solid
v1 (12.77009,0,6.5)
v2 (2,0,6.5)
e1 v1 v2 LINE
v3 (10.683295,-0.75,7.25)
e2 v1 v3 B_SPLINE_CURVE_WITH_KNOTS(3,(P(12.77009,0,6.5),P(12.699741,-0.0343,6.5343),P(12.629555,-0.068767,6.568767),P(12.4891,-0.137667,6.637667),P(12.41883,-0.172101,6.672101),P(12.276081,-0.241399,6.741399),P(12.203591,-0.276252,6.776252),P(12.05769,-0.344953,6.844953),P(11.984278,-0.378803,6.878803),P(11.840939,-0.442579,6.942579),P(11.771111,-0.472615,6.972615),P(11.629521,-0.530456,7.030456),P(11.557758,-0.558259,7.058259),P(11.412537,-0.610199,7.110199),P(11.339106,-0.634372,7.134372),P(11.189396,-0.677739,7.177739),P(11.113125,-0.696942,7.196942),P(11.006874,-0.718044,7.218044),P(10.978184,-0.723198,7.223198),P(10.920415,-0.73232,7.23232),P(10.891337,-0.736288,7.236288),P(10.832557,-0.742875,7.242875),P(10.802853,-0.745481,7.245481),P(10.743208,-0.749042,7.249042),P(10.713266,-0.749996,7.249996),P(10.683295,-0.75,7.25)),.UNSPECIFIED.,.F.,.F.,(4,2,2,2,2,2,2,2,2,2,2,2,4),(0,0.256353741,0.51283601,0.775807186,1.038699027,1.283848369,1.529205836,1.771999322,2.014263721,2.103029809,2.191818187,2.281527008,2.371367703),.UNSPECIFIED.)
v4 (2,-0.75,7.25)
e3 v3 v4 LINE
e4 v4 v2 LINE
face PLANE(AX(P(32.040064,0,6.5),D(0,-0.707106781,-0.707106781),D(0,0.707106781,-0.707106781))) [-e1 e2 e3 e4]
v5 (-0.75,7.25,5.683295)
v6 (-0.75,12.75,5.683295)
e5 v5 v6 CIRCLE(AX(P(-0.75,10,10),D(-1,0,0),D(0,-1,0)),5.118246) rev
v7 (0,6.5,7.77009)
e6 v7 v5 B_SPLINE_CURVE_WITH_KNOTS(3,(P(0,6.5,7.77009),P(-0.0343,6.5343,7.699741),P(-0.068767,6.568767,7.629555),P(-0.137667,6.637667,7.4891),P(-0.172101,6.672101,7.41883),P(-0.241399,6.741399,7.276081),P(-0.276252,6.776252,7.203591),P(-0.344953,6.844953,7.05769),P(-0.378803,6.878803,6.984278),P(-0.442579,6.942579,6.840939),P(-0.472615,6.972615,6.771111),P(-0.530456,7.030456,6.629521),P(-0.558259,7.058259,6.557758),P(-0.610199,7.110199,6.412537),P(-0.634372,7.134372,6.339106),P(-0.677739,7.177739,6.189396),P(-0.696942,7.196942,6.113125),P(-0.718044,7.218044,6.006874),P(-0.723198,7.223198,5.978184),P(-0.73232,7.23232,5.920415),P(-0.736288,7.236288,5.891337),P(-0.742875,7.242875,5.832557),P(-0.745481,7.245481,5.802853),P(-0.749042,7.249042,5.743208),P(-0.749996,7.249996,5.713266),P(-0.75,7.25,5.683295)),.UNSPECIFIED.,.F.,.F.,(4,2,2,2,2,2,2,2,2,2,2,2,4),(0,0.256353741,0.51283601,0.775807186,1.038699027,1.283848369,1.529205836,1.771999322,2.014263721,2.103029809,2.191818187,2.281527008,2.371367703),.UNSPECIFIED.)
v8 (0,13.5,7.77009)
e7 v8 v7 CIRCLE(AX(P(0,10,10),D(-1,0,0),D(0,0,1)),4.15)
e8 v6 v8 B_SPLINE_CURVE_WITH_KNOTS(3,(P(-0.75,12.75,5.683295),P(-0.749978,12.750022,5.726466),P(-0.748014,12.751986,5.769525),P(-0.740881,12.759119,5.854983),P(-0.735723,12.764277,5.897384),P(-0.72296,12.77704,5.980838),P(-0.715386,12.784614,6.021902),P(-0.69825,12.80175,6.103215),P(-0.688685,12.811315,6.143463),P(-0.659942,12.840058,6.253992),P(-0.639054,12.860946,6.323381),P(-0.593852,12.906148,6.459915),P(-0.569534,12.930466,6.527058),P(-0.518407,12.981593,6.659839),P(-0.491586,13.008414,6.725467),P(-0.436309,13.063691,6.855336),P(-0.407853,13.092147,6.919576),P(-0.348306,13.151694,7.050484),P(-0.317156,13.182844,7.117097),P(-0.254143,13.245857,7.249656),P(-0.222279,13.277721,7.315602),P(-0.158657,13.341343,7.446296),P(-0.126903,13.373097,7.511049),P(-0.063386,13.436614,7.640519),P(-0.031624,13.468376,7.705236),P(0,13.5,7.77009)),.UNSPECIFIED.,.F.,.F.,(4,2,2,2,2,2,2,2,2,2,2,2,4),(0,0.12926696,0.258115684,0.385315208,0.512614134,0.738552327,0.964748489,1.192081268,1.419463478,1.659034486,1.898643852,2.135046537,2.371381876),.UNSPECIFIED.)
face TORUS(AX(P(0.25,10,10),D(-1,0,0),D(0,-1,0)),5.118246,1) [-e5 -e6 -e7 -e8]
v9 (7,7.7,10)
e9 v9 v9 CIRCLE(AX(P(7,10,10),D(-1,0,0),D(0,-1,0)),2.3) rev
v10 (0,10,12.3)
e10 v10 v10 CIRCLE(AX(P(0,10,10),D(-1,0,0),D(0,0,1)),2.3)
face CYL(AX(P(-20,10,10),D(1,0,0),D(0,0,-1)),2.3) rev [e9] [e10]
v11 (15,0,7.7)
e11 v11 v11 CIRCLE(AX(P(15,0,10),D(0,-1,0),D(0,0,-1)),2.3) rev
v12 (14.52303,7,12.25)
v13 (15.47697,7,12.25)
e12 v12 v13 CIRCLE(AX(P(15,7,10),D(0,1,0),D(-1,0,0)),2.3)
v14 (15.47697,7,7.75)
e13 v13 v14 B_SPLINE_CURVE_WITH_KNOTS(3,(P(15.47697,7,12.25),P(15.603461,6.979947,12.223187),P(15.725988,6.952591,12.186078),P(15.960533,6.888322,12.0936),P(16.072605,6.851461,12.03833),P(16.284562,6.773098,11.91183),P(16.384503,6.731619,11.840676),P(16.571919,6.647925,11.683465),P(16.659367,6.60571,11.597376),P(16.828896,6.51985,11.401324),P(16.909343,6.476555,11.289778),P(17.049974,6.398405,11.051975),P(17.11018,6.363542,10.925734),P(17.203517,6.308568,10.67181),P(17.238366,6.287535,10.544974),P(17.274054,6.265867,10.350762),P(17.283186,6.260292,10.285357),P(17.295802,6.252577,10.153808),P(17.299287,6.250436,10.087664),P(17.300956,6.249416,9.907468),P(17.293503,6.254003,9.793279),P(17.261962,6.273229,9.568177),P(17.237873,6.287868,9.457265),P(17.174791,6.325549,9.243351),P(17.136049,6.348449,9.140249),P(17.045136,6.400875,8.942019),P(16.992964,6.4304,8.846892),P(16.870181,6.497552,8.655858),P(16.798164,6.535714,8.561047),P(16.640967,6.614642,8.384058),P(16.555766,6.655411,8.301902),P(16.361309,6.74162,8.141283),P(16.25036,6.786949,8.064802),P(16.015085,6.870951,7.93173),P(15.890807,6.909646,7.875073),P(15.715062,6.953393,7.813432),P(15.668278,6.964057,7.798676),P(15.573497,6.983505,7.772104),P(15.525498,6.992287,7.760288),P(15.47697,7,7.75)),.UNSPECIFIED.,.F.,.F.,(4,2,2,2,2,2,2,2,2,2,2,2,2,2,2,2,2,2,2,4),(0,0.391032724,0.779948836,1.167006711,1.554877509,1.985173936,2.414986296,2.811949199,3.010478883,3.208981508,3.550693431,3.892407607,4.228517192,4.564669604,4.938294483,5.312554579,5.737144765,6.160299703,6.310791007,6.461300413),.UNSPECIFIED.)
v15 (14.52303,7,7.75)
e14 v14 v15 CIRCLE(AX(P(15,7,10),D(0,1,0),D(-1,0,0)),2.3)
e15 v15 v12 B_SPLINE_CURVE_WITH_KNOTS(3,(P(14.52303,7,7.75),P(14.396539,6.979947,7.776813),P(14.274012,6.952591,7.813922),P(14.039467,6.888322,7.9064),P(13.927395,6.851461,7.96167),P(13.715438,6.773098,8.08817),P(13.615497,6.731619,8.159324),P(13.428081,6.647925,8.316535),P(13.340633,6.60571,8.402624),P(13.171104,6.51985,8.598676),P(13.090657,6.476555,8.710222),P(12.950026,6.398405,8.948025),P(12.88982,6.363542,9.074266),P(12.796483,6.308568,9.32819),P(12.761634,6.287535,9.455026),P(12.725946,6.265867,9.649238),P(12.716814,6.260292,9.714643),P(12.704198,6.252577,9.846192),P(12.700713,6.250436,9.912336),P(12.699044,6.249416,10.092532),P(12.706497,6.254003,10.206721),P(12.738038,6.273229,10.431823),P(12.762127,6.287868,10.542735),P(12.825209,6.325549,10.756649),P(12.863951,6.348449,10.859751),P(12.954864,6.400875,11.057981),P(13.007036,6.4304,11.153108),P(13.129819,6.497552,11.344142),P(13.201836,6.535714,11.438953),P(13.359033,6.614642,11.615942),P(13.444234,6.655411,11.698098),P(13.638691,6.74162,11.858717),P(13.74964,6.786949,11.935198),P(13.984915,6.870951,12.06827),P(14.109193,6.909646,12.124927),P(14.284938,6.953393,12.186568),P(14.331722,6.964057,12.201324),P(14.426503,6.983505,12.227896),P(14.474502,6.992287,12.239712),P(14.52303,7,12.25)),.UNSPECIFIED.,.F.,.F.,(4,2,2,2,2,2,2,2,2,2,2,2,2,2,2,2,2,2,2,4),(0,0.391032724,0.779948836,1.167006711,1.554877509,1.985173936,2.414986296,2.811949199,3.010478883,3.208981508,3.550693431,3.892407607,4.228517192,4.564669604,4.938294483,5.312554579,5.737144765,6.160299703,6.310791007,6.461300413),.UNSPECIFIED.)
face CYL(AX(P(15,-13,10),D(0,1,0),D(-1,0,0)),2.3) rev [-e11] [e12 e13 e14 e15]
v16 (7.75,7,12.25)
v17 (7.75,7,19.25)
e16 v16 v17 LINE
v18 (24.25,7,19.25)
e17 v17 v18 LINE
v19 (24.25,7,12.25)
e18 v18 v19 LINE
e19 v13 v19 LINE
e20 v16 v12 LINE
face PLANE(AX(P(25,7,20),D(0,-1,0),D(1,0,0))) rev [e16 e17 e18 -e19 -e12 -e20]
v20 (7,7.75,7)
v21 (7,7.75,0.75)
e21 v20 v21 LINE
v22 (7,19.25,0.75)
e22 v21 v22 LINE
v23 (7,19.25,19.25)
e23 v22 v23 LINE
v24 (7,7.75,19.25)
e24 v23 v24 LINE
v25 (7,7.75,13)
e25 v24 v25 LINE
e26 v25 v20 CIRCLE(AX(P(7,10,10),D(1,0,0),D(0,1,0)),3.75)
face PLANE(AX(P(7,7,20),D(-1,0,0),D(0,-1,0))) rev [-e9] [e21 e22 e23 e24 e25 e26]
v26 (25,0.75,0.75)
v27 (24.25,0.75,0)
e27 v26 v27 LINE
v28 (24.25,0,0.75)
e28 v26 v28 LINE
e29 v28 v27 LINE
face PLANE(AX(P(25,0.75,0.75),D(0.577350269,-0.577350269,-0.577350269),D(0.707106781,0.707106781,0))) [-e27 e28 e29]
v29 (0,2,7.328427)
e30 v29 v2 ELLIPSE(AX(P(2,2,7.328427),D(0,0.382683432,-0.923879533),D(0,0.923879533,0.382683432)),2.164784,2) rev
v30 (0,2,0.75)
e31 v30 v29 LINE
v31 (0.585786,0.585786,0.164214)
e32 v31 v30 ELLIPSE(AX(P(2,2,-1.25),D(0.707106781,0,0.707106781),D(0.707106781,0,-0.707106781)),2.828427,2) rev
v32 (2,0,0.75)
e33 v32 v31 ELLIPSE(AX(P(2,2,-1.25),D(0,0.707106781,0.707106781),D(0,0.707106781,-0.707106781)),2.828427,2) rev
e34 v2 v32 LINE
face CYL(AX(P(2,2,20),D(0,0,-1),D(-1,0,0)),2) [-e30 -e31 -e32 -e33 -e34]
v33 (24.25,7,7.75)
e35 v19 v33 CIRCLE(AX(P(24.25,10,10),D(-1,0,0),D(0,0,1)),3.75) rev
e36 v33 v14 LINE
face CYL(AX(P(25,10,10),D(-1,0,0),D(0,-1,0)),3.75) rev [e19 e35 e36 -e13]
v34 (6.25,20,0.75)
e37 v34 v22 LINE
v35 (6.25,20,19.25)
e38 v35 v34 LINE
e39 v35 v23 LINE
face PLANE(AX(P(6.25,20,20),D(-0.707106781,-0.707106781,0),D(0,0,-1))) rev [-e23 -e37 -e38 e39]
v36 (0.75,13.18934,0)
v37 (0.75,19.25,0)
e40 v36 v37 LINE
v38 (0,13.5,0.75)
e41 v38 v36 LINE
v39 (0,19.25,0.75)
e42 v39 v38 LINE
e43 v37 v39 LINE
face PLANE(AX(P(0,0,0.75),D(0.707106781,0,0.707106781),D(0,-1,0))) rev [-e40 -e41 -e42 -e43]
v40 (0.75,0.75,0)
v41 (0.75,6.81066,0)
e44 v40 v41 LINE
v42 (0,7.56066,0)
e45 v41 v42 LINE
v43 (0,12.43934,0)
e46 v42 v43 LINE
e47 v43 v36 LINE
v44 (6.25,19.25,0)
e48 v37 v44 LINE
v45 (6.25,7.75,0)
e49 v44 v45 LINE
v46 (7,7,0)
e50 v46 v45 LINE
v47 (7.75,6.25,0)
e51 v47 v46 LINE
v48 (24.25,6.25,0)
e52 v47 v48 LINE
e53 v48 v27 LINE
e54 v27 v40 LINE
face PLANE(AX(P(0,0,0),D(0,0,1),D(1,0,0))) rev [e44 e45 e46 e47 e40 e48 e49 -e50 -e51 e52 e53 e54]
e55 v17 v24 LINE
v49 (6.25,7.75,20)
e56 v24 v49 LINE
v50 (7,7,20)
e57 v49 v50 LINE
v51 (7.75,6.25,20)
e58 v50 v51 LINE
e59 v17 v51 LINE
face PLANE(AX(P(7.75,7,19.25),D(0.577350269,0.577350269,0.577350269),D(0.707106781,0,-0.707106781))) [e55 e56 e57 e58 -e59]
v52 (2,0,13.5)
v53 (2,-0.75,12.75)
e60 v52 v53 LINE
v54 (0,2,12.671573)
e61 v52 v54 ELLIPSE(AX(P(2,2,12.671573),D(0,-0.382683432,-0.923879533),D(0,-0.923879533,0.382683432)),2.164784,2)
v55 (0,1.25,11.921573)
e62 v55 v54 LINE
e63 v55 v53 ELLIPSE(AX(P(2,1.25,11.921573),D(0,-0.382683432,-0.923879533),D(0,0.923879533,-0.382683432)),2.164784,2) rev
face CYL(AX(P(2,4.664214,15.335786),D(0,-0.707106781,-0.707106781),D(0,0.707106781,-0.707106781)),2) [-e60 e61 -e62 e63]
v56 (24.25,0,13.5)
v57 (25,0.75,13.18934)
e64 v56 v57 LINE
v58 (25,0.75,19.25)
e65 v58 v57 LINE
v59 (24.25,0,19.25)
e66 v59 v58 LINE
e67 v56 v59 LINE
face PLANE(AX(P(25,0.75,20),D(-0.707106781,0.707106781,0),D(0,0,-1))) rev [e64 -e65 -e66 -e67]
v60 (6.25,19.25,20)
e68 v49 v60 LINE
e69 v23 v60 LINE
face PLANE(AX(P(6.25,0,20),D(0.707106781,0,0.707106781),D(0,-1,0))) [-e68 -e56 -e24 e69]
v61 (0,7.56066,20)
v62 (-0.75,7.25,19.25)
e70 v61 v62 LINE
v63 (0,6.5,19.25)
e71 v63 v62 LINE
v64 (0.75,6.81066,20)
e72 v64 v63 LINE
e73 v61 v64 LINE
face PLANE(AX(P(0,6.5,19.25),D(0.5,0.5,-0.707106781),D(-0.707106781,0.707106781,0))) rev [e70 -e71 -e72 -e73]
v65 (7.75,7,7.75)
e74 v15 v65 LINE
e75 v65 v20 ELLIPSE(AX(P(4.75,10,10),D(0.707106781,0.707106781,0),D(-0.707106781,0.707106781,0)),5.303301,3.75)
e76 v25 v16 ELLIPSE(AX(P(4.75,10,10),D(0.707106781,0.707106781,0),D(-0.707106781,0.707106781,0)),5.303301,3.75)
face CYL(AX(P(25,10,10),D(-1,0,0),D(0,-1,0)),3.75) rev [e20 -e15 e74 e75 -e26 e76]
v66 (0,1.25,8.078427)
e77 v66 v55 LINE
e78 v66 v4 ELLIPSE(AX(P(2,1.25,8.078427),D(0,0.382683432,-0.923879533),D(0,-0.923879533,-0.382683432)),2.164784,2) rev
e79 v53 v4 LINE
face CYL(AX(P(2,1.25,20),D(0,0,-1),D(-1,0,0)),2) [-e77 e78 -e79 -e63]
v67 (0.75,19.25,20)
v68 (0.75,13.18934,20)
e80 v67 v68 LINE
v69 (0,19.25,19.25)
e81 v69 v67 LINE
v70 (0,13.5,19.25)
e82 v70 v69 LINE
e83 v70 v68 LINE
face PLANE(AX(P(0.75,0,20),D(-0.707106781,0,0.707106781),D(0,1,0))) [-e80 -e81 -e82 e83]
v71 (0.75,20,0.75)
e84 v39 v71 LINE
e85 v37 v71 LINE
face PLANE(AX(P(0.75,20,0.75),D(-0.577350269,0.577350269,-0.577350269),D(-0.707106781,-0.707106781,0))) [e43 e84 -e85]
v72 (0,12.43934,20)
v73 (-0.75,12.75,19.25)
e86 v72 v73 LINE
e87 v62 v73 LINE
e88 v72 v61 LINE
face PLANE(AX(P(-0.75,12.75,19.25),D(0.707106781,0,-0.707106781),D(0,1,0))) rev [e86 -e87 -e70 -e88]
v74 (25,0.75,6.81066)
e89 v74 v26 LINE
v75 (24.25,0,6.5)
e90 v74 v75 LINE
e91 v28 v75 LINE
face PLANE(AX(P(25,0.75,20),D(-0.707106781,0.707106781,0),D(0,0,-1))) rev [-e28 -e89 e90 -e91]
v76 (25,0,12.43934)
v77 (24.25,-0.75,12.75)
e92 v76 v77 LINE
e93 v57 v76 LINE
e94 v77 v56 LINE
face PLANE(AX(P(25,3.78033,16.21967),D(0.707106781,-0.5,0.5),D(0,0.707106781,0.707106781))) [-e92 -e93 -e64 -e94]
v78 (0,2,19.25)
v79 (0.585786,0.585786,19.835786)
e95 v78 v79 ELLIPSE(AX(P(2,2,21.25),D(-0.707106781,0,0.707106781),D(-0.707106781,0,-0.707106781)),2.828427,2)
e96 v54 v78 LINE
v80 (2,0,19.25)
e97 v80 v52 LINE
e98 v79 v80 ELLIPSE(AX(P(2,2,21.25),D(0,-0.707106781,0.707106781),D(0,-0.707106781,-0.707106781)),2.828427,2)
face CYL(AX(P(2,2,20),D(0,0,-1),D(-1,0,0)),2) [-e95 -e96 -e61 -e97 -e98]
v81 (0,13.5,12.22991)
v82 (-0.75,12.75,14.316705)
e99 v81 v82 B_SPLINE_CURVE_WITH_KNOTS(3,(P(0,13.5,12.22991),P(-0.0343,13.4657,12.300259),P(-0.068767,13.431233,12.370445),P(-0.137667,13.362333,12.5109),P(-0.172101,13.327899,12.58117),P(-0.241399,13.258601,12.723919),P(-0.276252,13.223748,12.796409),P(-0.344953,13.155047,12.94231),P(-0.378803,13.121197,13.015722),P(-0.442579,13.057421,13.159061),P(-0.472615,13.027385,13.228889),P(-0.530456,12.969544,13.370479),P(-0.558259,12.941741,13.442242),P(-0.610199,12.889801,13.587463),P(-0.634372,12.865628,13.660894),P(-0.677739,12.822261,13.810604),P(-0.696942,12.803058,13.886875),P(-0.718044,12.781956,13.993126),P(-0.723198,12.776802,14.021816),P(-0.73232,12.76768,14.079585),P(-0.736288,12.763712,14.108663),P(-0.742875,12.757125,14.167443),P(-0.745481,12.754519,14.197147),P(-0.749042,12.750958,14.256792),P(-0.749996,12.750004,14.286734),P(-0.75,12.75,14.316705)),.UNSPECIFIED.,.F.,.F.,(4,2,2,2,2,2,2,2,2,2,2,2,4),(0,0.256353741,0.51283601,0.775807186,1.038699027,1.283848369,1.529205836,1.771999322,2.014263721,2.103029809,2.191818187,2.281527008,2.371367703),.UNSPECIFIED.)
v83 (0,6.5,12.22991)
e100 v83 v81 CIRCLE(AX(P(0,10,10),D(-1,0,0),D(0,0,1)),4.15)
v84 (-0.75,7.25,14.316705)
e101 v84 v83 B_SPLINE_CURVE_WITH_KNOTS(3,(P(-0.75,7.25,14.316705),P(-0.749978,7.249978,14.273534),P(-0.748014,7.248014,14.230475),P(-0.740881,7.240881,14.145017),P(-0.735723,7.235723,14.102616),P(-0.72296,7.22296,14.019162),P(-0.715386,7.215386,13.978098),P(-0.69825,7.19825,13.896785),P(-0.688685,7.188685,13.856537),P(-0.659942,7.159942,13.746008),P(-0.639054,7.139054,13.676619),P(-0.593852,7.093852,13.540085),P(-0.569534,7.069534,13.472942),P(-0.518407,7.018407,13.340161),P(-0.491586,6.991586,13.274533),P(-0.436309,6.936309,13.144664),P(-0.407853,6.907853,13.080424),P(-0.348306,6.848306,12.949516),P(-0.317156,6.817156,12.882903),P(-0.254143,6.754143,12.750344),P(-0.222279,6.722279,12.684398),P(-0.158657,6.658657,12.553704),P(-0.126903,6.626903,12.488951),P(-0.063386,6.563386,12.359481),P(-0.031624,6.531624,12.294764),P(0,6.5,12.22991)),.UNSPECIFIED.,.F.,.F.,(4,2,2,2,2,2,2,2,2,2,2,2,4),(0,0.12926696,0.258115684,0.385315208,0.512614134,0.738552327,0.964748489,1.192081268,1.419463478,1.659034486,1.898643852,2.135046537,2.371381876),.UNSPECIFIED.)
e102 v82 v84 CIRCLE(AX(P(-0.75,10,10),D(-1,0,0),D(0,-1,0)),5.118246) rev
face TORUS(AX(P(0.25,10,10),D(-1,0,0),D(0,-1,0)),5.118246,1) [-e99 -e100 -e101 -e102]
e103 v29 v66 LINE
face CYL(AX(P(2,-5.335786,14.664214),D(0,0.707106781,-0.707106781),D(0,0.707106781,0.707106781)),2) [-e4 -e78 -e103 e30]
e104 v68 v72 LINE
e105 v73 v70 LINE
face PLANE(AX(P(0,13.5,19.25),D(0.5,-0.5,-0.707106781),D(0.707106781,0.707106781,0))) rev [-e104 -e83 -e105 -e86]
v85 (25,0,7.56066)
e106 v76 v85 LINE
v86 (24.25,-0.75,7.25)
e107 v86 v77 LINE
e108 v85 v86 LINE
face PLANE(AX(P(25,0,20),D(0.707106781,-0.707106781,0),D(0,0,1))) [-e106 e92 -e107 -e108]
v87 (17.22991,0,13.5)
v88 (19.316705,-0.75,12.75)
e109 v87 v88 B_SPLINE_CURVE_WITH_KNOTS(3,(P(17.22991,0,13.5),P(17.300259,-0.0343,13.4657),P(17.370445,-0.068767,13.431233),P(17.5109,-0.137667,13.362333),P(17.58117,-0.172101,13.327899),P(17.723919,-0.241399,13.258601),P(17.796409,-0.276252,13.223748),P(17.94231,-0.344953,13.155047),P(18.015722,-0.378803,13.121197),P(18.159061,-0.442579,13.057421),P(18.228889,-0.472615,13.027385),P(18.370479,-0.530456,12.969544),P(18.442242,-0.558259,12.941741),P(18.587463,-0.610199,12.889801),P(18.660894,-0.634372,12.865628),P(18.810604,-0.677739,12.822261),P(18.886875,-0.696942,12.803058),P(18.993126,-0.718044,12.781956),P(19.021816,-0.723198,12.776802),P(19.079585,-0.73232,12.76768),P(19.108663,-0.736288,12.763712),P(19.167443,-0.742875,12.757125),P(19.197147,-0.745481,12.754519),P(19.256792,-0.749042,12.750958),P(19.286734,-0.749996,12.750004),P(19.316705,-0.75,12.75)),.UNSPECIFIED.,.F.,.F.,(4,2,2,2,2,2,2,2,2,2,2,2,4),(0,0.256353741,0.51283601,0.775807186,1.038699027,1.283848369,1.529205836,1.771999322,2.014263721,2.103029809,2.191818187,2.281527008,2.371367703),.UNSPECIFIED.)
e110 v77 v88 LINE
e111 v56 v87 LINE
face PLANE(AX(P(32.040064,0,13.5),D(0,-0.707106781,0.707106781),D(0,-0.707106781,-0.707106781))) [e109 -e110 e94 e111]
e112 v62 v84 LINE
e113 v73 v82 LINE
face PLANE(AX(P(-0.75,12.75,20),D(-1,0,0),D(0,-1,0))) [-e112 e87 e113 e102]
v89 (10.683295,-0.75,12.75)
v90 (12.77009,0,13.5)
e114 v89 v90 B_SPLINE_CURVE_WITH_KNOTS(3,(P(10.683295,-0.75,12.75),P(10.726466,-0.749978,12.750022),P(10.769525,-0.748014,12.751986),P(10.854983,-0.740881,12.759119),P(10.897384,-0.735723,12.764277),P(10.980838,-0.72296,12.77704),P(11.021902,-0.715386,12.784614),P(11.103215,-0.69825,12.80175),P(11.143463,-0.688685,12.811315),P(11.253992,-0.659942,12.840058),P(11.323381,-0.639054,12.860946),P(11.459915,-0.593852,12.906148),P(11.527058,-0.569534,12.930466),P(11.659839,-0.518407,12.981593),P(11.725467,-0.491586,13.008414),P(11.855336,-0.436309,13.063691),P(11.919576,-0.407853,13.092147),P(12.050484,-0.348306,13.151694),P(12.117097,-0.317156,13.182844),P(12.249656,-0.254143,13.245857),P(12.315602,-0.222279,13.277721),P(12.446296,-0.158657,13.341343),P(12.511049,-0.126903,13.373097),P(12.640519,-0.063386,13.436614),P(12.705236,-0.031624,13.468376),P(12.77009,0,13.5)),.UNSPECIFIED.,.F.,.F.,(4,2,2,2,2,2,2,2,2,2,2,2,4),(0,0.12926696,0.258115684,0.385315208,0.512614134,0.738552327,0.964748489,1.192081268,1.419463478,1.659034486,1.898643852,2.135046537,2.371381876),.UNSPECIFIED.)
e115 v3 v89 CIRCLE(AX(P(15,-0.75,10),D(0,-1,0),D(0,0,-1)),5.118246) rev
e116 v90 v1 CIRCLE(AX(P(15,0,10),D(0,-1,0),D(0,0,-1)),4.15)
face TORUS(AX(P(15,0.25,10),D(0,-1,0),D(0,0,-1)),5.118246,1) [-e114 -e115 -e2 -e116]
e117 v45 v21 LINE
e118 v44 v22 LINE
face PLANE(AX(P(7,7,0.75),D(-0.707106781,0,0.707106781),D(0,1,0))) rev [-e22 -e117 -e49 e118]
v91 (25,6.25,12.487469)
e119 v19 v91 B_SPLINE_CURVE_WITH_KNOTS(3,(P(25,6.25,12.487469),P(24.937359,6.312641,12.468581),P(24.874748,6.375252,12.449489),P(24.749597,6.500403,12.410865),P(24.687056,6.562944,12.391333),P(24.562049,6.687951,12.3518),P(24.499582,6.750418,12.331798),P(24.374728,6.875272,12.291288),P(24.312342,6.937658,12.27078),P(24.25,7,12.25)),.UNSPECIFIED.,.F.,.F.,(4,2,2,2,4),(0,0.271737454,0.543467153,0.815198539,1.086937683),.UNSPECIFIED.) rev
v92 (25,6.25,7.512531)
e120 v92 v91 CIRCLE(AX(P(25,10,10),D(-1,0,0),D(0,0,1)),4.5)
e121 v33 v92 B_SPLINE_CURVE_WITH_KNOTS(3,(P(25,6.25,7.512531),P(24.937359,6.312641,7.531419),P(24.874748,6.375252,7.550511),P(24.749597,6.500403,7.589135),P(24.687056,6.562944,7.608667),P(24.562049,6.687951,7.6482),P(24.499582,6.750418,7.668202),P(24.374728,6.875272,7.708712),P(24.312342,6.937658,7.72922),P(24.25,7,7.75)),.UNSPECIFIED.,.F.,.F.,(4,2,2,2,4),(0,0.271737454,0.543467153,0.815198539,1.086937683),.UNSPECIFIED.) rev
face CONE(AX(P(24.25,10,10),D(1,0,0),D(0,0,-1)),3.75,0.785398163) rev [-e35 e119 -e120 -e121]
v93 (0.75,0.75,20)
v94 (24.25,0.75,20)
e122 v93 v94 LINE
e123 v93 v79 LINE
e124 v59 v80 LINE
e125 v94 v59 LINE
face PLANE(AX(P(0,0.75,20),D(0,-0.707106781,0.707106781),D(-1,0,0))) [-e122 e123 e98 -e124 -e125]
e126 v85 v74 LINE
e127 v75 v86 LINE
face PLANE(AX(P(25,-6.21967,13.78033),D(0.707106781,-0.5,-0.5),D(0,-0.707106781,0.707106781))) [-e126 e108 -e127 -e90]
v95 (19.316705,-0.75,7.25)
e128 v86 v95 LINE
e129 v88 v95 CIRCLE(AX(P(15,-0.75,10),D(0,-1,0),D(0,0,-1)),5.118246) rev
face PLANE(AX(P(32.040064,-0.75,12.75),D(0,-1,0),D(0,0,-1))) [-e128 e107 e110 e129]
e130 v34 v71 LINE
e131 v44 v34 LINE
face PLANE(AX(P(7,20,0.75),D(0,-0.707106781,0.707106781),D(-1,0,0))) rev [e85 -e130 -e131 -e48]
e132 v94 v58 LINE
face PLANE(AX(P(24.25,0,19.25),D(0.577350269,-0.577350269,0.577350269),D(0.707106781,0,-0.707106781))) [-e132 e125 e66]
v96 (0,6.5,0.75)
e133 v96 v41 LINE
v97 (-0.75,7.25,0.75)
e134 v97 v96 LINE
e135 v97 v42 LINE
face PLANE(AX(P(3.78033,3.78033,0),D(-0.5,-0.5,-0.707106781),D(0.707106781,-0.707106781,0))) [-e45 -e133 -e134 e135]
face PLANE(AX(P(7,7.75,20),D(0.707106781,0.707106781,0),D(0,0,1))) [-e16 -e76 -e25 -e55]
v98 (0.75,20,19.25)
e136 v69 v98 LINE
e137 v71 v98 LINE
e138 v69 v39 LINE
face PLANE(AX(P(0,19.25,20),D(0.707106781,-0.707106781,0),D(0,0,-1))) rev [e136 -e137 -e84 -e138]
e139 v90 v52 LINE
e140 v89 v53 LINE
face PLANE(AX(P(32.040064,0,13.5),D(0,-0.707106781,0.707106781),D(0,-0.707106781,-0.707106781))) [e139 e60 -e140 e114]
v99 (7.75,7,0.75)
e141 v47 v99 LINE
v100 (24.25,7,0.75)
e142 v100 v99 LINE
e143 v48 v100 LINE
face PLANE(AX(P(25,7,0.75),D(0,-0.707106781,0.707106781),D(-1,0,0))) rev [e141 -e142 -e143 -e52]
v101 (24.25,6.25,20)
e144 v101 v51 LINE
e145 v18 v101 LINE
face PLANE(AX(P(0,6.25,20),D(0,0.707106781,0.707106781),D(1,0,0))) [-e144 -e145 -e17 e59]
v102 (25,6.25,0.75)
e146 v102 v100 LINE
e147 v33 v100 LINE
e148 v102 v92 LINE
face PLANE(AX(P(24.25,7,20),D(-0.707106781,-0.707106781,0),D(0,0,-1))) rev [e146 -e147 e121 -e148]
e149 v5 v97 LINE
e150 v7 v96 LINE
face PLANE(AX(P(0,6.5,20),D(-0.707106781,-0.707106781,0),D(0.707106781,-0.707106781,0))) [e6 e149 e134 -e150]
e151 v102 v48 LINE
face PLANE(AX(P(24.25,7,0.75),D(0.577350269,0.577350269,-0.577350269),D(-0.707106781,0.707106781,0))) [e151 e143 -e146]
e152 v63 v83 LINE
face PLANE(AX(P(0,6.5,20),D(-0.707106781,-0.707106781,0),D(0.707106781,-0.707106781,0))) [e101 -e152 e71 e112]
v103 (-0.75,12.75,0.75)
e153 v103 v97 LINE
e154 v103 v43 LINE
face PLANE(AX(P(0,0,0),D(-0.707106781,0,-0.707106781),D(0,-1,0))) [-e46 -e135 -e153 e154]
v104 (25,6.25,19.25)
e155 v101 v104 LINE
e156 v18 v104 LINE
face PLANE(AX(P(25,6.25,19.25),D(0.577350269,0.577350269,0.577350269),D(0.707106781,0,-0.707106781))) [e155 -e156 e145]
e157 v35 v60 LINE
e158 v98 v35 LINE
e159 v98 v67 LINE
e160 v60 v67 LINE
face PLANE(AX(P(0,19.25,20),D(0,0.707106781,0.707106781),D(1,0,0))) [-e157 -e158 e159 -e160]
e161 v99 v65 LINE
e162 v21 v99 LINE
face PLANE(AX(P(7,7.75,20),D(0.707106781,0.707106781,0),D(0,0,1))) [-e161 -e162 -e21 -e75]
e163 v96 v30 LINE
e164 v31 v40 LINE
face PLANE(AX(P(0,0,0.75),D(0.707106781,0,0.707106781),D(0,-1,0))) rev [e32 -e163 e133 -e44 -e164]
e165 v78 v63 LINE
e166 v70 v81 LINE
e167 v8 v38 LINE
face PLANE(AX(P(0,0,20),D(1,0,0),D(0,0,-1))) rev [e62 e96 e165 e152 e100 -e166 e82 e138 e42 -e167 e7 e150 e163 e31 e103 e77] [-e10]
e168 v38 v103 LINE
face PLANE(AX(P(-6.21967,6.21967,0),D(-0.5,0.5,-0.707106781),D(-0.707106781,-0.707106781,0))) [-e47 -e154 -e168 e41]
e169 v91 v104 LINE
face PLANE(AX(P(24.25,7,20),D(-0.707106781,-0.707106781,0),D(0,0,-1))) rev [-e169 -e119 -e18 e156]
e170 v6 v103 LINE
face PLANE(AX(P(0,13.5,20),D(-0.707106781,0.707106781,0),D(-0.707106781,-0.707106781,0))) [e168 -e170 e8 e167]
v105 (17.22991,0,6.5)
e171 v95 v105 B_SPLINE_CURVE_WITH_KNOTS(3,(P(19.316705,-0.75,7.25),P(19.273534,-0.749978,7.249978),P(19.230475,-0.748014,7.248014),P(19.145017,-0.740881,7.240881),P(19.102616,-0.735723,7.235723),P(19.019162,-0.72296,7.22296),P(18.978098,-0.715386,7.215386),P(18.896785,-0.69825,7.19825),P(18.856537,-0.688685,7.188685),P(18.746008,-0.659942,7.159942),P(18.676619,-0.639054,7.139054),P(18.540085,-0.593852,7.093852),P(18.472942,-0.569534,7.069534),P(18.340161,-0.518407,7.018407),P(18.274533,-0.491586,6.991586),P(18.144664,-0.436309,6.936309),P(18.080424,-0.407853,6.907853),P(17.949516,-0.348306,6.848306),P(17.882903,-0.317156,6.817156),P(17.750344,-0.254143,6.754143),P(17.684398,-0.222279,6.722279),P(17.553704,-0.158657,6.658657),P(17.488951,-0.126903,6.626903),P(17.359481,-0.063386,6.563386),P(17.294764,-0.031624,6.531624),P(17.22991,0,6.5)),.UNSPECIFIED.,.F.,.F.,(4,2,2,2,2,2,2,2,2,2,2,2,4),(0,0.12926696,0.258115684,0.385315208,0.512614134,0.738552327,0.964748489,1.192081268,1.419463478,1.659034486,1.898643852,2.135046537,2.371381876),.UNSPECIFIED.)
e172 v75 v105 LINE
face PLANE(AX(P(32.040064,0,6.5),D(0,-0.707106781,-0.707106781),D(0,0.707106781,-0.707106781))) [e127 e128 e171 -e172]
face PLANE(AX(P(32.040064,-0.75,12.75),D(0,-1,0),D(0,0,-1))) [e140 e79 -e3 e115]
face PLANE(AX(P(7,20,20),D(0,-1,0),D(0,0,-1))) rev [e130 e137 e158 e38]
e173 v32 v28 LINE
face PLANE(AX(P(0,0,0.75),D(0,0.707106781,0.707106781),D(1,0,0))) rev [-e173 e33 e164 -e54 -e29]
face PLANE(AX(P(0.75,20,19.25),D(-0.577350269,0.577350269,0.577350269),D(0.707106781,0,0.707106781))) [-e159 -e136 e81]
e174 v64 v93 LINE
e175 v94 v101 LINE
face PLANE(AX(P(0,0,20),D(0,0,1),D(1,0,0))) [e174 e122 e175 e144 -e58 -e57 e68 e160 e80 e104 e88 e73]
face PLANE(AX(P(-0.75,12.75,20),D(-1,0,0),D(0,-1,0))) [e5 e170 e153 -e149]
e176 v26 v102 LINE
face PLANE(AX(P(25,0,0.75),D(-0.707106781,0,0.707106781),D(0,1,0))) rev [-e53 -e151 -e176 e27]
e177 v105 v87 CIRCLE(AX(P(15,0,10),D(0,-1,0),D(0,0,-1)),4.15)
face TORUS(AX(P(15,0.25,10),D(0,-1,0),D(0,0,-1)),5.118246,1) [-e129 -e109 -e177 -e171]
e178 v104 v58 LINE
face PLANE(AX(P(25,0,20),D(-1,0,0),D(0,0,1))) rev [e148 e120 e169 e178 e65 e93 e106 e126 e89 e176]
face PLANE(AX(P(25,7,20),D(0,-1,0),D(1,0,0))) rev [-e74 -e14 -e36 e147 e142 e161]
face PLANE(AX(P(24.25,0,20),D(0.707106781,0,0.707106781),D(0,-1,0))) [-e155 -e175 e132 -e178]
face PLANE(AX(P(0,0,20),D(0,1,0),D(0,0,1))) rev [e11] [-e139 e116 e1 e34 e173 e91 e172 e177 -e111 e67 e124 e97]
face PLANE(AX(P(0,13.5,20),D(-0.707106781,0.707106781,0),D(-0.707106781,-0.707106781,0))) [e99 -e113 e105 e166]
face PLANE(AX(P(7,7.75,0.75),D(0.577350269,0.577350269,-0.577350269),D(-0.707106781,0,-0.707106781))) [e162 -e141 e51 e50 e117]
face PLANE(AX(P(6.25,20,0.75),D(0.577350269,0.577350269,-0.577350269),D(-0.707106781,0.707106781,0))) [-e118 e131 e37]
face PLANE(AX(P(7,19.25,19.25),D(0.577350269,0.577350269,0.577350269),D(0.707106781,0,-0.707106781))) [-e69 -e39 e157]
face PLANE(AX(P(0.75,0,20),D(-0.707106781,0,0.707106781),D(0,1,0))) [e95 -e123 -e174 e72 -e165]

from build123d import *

# Parameters (mm, degrees)
AUFSATZ_LINEAR_AUSTRAGEN1_DEPTH      = 20
AUFSATZ_LINEAR_AUSTRAGEN2_DEPTH      = 20
AUFSATZ_LINEAR_AUSTRAGEN3_DEPTH      = 25
SCHNITT_LINEAR_AUSTRAGEN1_DEPTH      = 20
SCHNITT_LINEAR_AUSTRAGEN1_DEPTH_BACK = 20
SKIZZE2_R                            = 2.3
SKIZZE3_R                            = 3.75
SCHNITT_LINEAR_AUSTRAGEN2_DEPTH      = 34.526109228
SKIZZE4_R                            = 2.3
SCHNITT_LINEAR_AUSTRAGEN3_DEPTH      = 20
FASE1_SIZE                           = 0.75
VERRUNDUNG1_R                        = 2
SKIZZE7_R                            = 4.15
SCHNITT_LINEAR_AUSTRAGEN4_DEPTH      = 20
SKIZZE8_R                            = 4.15
SCHNITT_LINEAR_AUSTRAGEN5_DEPTH      = 20
VERRUNDUNG2_R                        = 1


with BuildPart() as part:
    # Skizze1 → Aufsatz-Linear austragen1 (new body)
    with BuildSketch(Plane.XY):
        Polygon((0, 0), (0, 20), (7, 20), (7, 7), (25, 7), (25, 0), align=None)
    extrude(amount=AUFSATZ_LINEAR_AUSTRAGEN1_DEPTH)

    # Skizze5 → Aufsatz-Linear austragen2 (add)
    with BuildSketch(Plane(origin=(0, 0, 0), x_dir=(-1, 0, 0), z_dir=(0, 0, -1))):
        Polygon((0, 6.5), (0, 13.5), (0.75, 12.75), (0.75, 7.25), align=None)
    extrude(amount=-AUFSATZ_LINEAR_AUSTRAGEN2_DEPTH)

    # Skizze6 → Aufsatz-Linear austragen3 (add)
    with BuildSketch(Plane.ZY):
        Polygon((6.5, 0), (13.5, 0), (12.75, -0.75), (7.25, -0.75), align=None)
    extrude(amount=-AUFSATZ_LINEAR_AUSTRAGEN3_DEPTH)

    # Skizze2 → Schnitt-Linear austragen1 (cut, two sides: drawn at the far end of the back side and taken through both)
    with BuildSketch(Plane.ZY.offset(-SCHNITT_LINEAR_AUSTRAGEN1_DEPTH_BACK)):
        with Locations(Location((10, 10, 0), (0, 0, 270))):
            Circle(SKIZZE2_R)
    extrude(amount=SCHNITT_LINEAR_AUSTRAGEN1_DEPTH + SCHNITT_LINEAR_AUSTRAGEN1_DEPTH_BACK, mode=Mode.SUBTRACT)

    # Skizze3 → Schnitt-Linear austragen2 (cut, through all)
    with BuildSketch(Plane(origin=(7, 0, 0), x_dir=(0, 0, -1), z_dir=(1, 0, 0))):
        with Locations((-10, 10)):
            Circle(SKIZZE3_R)
    extrude(amount=SCHNITT_LINEAR_AUSTRAGEN2_DEPTH, mode=Mode.SUBTRACT)

    # Skizze4 → Schnitt-Linear austragen3 (cut)
    with BuildSketch(Plane(origin=(0, 7, 0), x_dir=(1, 0, 0), z_dir=(0, 1, 0))):
        with Locations(Location((15, -10, 0), (0, 0, 258.031254445))):
            Circle(SKIZZE4_R)
    extrude(amount=-SCHNITT_LINEAR_AUSTRAGEN3_DEPTH, mode=Mode.SUBTRACT)

    # Fase1
    fase1_edges = [part.edges().sort_by_distance(p)[0] for p in [
        (0, 20, 10),
        (7, 20, 10),
        (7, 7, 16.125),
        (25, 7, 16.125),
        (25, 0, 16.75),
        (16, 7, 20),
        (7, 13.5, 20),
        (0, 3.25, 0),
        (0, 3.25, 20),
        (3.5, 20, 20),
        (-0.375, 6.875, 20),
        (-0.375, 13.125, 20),
        (-0.75, 10, 20),
        (-0.375, 6.875, 0),
        (-0.75, 10, 0),
        (-0.375, 13.125, 0),
        (0, 16.75, 20),
        (25, 0, 3.25),
        (25, -0.375, 13.125),
        (25, -0.75, 10),
        (25, -0.375, 6.875),
        (12.5, 0, 20),
        (7, 7, 3.875),
        (25, 7, 3.875),
        (25, 6.25, 10),
        (0, 16.75, 0),
        (3.5, 20, 0),
        (7, 13.5, 0),
        (16, 7, 0),
        (25, 3.5, 0),
        (12.5, 0, 0),
        (25, 3.5, 20),
    ]]
    chamfer(fase1_edges, length=FASE1_SIZE)

    # Verrundung1
    verrundung1_edges = [part.edges().sort_by_distance(p)[0] for p in [
        (0, 0, 3.625),
        (0, -0.375, 13.125),
        (0, -0.375, 6.875),
        (0, -0.75, 10),
        (0, 0, 16.375),
    ]]
    fillet(verrundung1_edges, radius=VERRUNDUNG1_R)

    # Skizze7 → Schnitt-Linear austragen4 (cut)
    with BuildSketch(Plane.ZY):
        with Locations((10, 10)):
            Circle(SKIZZE7_R)
    extrude(amount=SCHNITT_LINEAR_AUSTRAGEN4_DEPTH, mode=Mode.SUBTRACT)

    # Skizze8 → Schnitt-Linear austragen5 (cut)
    with BuildSketch(Plane.XZ):
        with Locations((15, 10)):
            Circle(SKIZZE8_R)
    extrude(amount=SCHNITT_LINEAR_AUSTRAGEN5_DEPTH, mode=Mode.SUBTRACT)

    # Verrundung2
    # the kernel refuses this fillet: 1 mm, written as the material it takes off along each edge
    with BuildSketch(Plane(origin=(15, -0.75, 10), x_dir=(-0.259943773458836, 0, -0.9656237541817109), z_dir=(0.9656237541817109, 0, -0.259943773458836))) as verrundung2_piece_1:
        with BuildLine():
            CenterArc((5.118245837, 1), VERRUNDUNG2_R, 194.477512186, 75.522487814)
            Line((4.15, 0.75), (4.130635083, 0.745))
            ThreePointArc((4.130635083, 0.745), (4.13, 0.375), (4.13, 0))
            Line((4.13, 0), (4.15, -0.02))
            Line((4.15, -0.02), (5.118245837, -0.02))
            Line((5.118245837, -0.02), (5.118245837, 0))
        make_face()
    revolve(axis=Axis((15, -0.75, 10), (0, 1, 0)), revolution_arc=149.866548224, mode=Mode.SUBTRACT)
    with BuildSketch(Plane(origin=(15, -0.75, 10), x_dir=(0.259943773458836, 0, -0.9656237541817109), z_dir=(-0.9656237541817109, 0, -0.259943773458836))) as verrundung2_piece_2:
        with BuildLine():
            CenterArc((5.118245837, -1), VERRUNDUNG2_R, 90, 75.522487814)
            Line((4.15, -0.75), (4.130635083, -0.745))
            ThreePointArc((4.130635083, -0.745), (4.13, -0.375), (4.13, 0))
            Line((4.13, 0), (4.15, 0.02))
            Line((4.15, 0.02), (5.118245837, 0.02))
            Line((5.118245837, 0.02), (5.118245837, 0))
        make_face()
    revolve(axis=Axis((15, -0.75, 10), (0, -1, 0)), revolution_arc=149.866548224, mode=Mode.SUBTRACT)
    with BuildSketch(Plane(origin=(-0.75, 10, 10), x_dir=(0, -0.9656237541817109, -0.2599437734588364), z_dir=(0, -0.2599437734588364, 0.9656237541817109))) as verrundung2_piece_3:
        with BuildLine():
            CenterArc((5.118245837, 1), VERRUNDUNG2_R, 194.477512186, 75.522487814)
            Line((4.15, 0.75), (4.130635083, 0.745))
            ThreePointArc((4.130635083, 0.745), (4.13, 0.375), (4.13, 0))
            Line((4.13, 0), (4.15, -0.02))
            Line((4.15, -0.02), (5.118245837, -0.02))
            Line((5.118245837, -0.02), (5.118245837, 0))
        make_face()
    revolve(axis=Axis((-0.75, 10, 10), (1, 0, 0)), revolution_arc=149.866548224, mode=Mode.SUBTRACT)
    with BuildSketch(Plane(origin=(-0.75, 10, 10), x_dir=(0, -0.9656237541817109, 0.2599437734588359), z_dir=(0, -0.2599437734588359, -0.9656237541817109))) as verrundung2_piece_4:
        with BuildLine():
            CenterArc((5.118245837, -1), VERRUNDUNG2_R, 90, 75.522487814)
            Line((4.15, -0.75), (4.130635083, -0.745))
            ThreePointArc((4.130635083, -0.745), (4.13, -0.375), (4.13, 0))
            Line((4.13, 0), (4.15, 0.02))
            Line((4.15, 0.02), (5.118245837, 0.02))
            Line((5.118245837, 0.02), (5.118245837, 0))
        make_face()
    revolve(axis=Axis((-0.75, 10, 10), (-1, 0, 0)), revolution_arc=149.866548224, mode=Mode.SUBTRACT)


solid = part.part
